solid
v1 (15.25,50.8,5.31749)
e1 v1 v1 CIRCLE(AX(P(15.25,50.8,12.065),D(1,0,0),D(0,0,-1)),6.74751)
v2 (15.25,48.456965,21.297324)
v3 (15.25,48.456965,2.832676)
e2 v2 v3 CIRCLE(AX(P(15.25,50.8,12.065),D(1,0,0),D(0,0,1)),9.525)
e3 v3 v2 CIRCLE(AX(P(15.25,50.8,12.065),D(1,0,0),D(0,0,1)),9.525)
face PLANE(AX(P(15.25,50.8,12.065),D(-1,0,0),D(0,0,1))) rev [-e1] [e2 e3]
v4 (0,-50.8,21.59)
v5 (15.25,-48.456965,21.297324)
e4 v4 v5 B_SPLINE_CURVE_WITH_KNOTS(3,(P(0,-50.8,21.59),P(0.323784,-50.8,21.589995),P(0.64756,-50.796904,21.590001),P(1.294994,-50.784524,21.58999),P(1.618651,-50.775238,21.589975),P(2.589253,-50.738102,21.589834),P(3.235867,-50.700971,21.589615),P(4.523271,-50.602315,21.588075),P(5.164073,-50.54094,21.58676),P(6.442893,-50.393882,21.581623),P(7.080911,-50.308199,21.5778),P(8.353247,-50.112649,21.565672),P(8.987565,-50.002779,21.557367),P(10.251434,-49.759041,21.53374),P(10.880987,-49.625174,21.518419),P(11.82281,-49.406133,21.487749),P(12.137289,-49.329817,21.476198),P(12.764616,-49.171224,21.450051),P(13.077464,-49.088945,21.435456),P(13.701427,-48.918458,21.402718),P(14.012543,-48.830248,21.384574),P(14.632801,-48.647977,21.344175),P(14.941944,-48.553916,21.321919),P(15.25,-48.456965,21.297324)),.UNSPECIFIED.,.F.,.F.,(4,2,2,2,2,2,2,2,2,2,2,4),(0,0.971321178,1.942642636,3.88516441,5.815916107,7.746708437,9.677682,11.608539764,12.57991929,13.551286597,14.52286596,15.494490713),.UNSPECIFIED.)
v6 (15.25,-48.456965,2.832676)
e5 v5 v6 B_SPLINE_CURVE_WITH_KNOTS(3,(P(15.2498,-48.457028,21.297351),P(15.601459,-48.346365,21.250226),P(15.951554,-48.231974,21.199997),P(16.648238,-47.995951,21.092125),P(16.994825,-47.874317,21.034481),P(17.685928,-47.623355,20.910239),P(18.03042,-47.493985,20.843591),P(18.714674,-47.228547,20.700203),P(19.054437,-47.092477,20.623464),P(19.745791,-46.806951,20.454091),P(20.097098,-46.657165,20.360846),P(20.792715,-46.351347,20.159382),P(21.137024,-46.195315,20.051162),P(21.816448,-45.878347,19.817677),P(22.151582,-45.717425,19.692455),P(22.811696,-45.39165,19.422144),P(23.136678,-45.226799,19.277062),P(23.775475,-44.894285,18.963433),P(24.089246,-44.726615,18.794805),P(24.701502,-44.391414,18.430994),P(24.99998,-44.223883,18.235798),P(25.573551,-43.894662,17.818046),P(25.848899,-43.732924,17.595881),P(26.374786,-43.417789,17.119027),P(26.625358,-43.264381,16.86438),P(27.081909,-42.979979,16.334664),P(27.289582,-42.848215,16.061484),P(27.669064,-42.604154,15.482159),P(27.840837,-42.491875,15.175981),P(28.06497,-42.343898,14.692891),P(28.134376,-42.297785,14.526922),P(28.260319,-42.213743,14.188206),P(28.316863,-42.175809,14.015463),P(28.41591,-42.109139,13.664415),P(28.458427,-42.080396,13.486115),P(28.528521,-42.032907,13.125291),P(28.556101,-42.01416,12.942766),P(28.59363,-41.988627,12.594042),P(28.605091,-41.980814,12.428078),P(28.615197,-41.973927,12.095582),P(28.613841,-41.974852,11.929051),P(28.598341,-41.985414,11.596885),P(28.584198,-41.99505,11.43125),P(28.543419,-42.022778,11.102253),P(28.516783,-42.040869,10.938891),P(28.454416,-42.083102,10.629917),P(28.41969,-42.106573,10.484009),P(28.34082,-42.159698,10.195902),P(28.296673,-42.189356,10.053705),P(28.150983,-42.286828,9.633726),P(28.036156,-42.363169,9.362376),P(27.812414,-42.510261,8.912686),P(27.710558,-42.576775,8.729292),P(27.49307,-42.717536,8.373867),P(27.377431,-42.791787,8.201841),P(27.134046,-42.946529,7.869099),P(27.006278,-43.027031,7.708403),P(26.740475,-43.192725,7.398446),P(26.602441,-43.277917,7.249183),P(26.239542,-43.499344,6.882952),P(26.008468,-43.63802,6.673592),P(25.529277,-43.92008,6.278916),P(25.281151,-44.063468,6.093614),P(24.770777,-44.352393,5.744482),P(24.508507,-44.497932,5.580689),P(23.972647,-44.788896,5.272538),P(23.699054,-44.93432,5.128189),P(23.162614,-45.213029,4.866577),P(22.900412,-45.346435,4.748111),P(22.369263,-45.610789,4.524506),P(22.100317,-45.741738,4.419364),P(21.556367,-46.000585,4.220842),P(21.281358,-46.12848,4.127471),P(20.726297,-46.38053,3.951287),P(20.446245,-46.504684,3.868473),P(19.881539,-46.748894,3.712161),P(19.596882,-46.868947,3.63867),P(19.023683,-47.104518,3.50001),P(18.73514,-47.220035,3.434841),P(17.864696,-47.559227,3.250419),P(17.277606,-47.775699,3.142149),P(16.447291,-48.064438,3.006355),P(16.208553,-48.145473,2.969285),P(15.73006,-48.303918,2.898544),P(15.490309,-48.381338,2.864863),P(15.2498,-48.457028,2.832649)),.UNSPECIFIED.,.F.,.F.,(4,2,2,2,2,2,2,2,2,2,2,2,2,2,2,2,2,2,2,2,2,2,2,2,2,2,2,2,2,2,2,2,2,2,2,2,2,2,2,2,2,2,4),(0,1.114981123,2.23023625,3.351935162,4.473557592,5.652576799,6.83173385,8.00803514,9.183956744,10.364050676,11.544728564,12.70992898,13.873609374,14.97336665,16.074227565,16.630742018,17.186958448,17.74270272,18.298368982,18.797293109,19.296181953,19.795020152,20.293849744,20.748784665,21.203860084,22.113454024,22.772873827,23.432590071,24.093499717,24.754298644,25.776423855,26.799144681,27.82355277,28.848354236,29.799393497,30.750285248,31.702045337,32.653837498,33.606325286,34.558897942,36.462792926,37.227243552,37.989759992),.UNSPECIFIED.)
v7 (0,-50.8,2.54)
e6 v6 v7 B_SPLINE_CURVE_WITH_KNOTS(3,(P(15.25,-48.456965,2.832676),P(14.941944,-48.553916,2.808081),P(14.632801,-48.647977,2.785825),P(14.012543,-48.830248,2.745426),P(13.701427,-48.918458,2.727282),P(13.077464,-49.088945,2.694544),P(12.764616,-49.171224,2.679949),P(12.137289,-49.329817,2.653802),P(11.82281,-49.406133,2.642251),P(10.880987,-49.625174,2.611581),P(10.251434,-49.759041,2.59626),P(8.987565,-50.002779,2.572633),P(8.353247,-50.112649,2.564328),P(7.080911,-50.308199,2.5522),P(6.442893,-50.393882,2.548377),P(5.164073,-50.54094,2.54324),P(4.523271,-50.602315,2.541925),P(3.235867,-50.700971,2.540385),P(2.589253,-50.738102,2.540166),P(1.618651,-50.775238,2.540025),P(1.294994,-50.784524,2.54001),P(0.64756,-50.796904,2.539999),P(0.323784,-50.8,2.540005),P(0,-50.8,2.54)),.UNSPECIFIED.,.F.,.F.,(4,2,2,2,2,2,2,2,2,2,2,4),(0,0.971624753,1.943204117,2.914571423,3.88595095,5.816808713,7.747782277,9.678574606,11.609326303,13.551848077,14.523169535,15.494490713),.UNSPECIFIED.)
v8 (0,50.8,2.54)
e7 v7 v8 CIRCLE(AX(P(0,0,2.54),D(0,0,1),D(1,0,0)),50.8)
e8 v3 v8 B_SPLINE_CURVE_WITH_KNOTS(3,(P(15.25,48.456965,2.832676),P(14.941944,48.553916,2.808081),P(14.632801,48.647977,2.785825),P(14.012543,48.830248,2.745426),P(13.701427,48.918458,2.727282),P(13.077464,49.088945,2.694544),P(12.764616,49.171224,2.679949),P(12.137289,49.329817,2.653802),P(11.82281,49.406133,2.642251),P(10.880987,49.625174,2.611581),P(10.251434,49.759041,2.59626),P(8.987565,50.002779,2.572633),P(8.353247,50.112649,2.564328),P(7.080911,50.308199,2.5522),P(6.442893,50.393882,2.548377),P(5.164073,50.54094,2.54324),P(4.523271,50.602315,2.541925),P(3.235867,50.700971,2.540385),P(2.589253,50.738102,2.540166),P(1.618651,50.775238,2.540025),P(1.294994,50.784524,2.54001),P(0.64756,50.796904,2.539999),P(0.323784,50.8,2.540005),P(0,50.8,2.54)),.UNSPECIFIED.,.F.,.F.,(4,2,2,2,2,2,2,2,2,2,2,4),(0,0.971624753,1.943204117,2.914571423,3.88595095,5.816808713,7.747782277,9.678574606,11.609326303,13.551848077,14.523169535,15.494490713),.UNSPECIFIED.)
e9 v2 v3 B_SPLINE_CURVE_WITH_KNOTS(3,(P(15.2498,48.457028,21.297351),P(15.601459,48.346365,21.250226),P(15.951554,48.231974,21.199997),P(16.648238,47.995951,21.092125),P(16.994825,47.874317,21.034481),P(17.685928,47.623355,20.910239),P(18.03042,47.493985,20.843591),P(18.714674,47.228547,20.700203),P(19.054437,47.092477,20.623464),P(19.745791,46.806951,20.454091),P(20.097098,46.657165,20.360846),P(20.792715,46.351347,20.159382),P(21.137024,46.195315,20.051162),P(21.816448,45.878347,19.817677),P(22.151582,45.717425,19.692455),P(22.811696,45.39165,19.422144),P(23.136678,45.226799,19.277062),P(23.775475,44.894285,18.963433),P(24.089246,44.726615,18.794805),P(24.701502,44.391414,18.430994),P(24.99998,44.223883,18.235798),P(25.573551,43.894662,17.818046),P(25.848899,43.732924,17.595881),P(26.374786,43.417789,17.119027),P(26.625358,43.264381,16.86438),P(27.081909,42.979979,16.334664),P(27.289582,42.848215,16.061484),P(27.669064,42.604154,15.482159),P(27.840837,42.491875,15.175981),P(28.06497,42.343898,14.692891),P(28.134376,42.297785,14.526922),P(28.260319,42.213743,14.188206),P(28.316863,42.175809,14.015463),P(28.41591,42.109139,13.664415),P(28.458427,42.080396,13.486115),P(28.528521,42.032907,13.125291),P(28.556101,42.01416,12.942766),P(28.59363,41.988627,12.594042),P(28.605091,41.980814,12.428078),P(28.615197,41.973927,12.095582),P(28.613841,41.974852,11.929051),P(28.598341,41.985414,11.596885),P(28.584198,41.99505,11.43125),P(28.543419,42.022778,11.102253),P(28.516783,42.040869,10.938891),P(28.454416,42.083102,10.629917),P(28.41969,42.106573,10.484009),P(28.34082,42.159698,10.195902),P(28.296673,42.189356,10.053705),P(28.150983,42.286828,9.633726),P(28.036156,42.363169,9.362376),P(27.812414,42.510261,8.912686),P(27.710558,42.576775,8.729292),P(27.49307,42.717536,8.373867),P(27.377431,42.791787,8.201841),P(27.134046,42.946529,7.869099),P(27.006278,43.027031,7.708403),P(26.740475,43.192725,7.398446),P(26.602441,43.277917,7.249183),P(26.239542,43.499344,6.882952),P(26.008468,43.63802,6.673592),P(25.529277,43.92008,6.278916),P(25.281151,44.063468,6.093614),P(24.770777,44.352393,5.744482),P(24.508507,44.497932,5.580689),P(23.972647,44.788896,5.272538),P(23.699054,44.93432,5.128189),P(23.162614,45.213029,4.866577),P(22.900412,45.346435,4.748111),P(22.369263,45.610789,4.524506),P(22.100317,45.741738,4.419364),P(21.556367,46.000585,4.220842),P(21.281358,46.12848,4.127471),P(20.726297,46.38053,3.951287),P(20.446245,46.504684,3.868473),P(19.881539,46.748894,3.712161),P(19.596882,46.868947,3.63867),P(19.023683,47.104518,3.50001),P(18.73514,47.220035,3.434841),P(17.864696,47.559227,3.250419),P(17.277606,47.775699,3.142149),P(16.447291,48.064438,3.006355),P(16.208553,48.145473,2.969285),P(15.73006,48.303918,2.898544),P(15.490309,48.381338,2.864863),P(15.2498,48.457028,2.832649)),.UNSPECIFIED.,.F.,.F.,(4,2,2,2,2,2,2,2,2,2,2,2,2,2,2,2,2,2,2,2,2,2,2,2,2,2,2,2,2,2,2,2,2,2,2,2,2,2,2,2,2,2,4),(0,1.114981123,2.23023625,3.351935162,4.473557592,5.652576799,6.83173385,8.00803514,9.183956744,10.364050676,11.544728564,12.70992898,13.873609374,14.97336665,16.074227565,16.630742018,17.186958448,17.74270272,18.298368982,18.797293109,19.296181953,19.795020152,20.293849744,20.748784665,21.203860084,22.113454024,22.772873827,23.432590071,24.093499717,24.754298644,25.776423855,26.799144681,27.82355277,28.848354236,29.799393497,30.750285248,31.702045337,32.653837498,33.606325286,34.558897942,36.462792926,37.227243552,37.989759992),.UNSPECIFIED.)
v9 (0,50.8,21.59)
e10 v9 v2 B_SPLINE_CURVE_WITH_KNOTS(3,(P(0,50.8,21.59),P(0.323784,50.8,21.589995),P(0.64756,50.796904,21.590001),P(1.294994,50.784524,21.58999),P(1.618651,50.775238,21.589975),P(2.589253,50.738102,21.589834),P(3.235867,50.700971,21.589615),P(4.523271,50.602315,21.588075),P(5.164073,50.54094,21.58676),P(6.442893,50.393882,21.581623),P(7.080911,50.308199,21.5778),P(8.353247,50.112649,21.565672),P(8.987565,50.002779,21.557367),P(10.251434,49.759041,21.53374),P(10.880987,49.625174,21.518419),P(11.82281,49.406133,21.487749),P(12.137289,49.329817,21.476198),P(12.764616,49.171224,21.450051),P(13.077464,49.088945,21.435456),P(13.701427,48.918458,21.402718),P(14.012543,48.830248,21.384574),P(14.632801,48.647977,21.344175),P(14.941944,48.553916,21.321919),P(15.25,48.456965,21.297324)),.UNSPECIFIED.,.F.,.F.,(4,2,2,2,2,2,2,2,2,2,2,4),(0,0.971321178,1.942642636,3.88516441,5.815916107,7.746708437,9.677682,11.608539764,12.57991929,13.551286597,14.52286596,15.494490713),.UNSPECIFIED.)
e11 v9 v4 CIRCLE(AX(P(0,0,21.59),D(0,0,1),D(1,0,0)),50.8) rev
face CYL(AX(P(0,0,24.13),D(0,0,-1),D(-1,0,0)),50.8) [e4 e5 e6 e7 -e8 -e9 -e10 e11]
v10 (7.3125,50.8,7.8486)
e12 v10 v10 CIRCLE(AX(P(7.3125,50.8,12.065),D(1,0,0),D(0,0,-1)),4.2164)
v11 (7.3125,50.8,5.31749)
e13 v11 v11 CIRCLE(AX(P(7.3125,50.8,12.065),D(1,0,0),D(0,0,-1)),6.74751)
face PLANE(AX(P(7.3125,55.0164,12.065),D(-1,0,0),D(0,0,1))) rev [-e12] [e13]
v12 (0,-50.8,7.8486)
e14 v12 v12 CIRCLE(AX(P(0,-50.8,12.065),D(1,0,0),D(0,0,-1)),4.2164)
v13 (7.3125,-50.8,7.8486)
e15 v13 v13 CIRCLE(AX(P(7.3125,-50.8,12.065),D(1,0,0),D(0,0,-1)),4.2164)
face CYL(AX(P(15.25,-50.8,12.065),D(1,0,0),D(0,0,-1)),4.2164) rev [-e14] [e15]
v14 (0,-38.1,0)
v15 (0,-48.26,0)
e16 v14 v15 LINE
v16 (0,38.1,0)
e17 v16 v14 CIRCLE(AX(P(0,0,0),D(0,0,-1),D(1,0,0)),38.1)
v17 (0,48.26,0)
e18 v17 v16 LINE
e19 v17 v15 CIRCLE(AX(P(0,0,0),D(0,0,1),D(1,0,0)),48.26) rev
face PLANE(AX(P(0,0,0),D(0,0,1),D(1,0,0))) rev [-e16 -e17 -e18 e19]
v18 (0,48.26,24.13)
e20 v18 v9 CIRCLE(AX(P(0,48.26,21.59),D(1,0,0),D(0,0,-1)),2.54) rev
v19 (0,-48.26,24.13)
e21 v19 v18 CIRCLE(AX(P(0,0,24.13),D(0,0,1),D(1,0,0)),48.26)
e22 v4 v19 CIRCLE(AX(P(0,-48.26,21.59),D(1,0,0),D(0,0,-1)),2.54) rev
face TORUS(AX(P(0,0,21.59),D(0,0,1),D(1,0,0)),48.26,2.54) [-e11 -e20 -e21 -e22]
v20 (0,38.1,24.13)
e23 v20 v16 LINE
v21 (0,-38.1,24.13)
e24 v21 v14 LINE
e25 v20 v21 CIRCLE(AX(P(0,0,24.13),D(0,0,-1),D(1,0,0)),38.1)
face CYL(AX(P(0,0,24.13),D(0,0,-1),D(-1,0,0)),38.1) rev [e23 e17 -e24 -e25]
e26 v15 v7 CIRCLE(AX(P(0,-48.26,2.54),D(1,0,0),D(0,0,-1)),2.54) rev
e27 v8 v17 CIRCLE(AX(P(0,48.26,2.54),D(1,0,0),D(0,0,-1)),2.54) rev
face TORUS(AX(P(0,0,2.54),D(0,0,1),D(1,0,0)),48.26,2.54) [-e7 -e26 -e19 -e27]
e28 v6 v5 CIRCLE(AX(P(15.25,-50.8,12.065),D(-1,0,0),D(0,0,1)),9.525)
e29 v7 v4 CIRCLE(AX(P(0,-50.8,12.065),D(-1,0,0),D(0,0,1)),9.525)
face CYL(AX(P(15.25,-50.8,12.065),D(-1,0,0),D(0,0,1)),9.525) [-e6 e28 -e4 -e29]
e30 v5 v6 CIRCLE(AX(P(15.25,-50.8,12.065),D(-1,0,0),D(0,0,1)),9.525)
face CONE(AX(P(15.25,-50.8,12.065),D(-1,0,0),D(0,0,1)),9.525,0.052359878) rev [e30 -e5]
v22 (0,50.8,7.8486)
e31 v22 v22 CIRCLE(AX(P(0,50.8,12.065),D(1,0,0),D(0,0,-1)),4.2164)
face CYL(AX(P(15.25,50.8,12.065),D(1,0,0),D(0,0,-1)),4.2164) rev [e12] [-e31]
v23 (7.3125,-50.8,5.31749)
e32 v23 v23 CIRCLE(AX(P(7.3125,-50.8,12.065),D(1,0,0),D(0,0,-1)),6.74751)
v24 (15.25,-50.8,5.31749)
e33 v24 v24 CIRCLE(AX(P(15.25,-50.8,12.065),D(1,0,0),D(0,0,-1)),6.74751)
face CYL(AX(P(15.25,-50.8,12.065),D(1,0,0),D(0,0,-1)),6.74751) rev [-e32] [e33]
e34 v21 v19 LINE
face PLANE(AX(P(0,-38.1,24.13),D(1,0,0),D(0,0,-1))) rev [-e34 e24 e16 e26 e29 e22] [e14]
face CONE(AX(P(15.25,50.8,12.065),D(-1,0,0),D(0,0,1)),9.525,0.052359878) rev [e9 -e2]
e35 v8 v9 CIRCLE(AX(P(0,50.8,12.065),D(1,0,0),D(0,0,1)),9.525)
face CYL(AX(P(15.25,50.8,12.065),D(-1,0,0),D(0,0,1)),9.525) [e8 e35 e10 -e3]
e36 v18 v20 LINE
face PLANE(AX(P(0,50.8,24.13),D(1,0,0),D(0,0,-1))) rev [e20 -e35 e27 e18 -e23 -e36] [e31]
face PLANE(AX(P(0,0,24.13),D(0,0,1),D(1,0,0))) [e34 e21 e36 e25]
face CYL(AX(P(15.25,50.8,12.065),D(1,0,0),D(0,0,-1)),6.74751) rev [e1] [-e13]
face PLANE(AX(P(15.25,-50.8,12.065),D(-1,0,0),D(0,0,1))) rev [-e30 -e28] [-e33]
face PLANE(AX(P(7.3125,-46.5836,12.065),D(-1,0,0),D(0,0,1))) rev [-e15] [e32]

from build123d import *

# Parameters (mm, degrees)
BOSS_EXTRUDE1_DEPTH                               = 24.13
SKETCH2_R                                         = 9.525
BOSS_EXTRUDE2_DEPTH                               = 15.25
CUT_EXTRUDE1_START                                = -15.25
SKETCH2_3_R                                       = 9.525
CUT_EXTRUDE1_DEPTH                                = 15.25
CUT_EXTRUDE1_DRAFT                                = -3
CBORE_FOR_5_16_SOCKET_HEAD_CAP_SCREW2_D           = 8.4328
CBORE_FOR_5_16_SOCKET_HEAD_CAP_SCREW2_CBORE_D     = 13.49502
CBORE_FOR_5_16_SOCKET_HEAD_CAP_SCREW2_CBORE_DEPTH = 7.9375
MIRROR1_START                                     = -15.25
MIRROR1_COPY_1_SKETCH_R                           = 9.525
MIRROR1_COPY_1_DEPTH                              = 15.25
MIRROR1_COPY_1_DRAFT                              = -3
FILLET1_R                                         = 2.54


with BuildPart() as part:
    # Sketch1 → Boss-Extrude1 (new body)
    with BuildSketch(Plane.XY):
        with BuildLine():
            Line((0, 50.8), (0, 38.1))
            ThreePointArc((0, 38.1), (38.1, 0), (0, -38.1))
            Line((0, -38.1), (0, -50.8))
            ThreePointArc((0, -50.8), (50.8, 0), (0, 50.8))
        make_face()
    extrude(amount=BOSS_EXTRUDE1_DEPTH)

    # Sketch2 → Boss-Extrude2 (add)
    with BuildSketch(Plane.ZY):
        with Locations((12.065, -50.8)):
            Circle(SKETCH2_R)
    boss_extrude2 = extrude(amount=-BOSS_EXTRUDE2_DEPTH)


with BuildPart() as cut_extrude1_tool:
    # Sketch2<3> → Cut-Extrude1 (with draft: the straight prism first)
    with BuildSketch(Plane.ZY.offset(CUT_EXTRUDE1_START)):
        with Locations((12.065, -50.8)):
            Circle(SKETCH2_3_R)
    extrude(amount=-CUT_EXTRUDE1_DEPTH)
    # Cut-Extrude1: the draft: its side faces are tilted about the plane it starts from
    cut_extrude1_sides = [cut_extrude1_tool.faces().sort_by_distance(p)[0] for p in [
        (22.875, -50.8, 2.54),
    ]]
    draft(cut_extrude1_sides, Plane.ZY.offset(CUT_EXTRUDE1_START), CUT_EXTRUDE1_DRAFT)


with BuildPart() as part_1:
    add(part.part)

    # Cut-Extrude1: cut by cut_extrude1_tool
    add(cut_extrude1_tool.part, mode=Mode.SUBTRACT)

    # CBORE for 5/16 Socket Head Cap Screw2 (through all)
    with Locations(Plane(origin=(15.25, -50.8, 12.065), x_dir=(0, 0, 1), z_dir=(1, 0, 0))):
        with Locations((0, 0)):
            cbore_for_5_16_socket_head_cap_screw2 = CounterBoreHole(CBORE_FOR_5_16_SOCKET_HEAD_CAP_SCREW2_D / 2, CBORE_FOR_5_16_SOCKET_HEAD_CAP_SCREW2_CBORE_D / 2, CBORE_FOR_5_16_SOCKET_HEAD_CAP_SCREW2_CBORE_DEPTH)

    # Mirror1: Boss-Extrude2, CBORE for 5/16 Socket Head Cap Screw2 across plane
    add(boss_extrude2.mirror(Plane.ZX))
    add(cbore_for_5_16_socket_head_cap_screw2.mirror(Plane.ZX), mode=Mode.SUBTRACT)


with BuildPart() as mirror1_copy_1_tool:
    # Mirror1 copy 1 sketch → Mirror1 copy 1 (with draft: the straight prism first)
    with BuildSketch(Plane.ZY.offset(MIRROR1_START)):
        with Locations((12.065, 50.8)):
            Circle(MIRROR1_COPY_1_SKETCH_R)
    extrude(amount=-MIRROR1_COPY_1_DEPTH)
    # Mirror1 copy 1: the draft: its side faces are tilted about the plane it starts from
    mirror1_copy_1_sides = [mirror1_copy_1_tool.faces().sort_by_distance(p)[0] for p in [
        (22.875, 50.8, 2.54),
    ]]
    draft(mirror1_copy_1_sides, Plane.ZY.offset(MIRROR1_START), MIRROR1_COPY_1_DRAFT)


with BuildPart() as part_2:
    add(part_1.part)

    # Mirror1 copy 1: cut by mirror1_copy_1_tool
    add(mirror1_copy_1_tool.part, mode=Mode.SUBTRACT)

    # Fillet1
    fillet1_edges = [part_2.edges().sort_by_distance(p)[0] for p in [
        (50.8, 0, 24.13),
        (50.8, 0, 0),
    ]]
    fillet(fillet1_edges, radius=FILLET1_R - 0.0001)  # a hair under: the kernel refuses the full size


solid = part_2.part
